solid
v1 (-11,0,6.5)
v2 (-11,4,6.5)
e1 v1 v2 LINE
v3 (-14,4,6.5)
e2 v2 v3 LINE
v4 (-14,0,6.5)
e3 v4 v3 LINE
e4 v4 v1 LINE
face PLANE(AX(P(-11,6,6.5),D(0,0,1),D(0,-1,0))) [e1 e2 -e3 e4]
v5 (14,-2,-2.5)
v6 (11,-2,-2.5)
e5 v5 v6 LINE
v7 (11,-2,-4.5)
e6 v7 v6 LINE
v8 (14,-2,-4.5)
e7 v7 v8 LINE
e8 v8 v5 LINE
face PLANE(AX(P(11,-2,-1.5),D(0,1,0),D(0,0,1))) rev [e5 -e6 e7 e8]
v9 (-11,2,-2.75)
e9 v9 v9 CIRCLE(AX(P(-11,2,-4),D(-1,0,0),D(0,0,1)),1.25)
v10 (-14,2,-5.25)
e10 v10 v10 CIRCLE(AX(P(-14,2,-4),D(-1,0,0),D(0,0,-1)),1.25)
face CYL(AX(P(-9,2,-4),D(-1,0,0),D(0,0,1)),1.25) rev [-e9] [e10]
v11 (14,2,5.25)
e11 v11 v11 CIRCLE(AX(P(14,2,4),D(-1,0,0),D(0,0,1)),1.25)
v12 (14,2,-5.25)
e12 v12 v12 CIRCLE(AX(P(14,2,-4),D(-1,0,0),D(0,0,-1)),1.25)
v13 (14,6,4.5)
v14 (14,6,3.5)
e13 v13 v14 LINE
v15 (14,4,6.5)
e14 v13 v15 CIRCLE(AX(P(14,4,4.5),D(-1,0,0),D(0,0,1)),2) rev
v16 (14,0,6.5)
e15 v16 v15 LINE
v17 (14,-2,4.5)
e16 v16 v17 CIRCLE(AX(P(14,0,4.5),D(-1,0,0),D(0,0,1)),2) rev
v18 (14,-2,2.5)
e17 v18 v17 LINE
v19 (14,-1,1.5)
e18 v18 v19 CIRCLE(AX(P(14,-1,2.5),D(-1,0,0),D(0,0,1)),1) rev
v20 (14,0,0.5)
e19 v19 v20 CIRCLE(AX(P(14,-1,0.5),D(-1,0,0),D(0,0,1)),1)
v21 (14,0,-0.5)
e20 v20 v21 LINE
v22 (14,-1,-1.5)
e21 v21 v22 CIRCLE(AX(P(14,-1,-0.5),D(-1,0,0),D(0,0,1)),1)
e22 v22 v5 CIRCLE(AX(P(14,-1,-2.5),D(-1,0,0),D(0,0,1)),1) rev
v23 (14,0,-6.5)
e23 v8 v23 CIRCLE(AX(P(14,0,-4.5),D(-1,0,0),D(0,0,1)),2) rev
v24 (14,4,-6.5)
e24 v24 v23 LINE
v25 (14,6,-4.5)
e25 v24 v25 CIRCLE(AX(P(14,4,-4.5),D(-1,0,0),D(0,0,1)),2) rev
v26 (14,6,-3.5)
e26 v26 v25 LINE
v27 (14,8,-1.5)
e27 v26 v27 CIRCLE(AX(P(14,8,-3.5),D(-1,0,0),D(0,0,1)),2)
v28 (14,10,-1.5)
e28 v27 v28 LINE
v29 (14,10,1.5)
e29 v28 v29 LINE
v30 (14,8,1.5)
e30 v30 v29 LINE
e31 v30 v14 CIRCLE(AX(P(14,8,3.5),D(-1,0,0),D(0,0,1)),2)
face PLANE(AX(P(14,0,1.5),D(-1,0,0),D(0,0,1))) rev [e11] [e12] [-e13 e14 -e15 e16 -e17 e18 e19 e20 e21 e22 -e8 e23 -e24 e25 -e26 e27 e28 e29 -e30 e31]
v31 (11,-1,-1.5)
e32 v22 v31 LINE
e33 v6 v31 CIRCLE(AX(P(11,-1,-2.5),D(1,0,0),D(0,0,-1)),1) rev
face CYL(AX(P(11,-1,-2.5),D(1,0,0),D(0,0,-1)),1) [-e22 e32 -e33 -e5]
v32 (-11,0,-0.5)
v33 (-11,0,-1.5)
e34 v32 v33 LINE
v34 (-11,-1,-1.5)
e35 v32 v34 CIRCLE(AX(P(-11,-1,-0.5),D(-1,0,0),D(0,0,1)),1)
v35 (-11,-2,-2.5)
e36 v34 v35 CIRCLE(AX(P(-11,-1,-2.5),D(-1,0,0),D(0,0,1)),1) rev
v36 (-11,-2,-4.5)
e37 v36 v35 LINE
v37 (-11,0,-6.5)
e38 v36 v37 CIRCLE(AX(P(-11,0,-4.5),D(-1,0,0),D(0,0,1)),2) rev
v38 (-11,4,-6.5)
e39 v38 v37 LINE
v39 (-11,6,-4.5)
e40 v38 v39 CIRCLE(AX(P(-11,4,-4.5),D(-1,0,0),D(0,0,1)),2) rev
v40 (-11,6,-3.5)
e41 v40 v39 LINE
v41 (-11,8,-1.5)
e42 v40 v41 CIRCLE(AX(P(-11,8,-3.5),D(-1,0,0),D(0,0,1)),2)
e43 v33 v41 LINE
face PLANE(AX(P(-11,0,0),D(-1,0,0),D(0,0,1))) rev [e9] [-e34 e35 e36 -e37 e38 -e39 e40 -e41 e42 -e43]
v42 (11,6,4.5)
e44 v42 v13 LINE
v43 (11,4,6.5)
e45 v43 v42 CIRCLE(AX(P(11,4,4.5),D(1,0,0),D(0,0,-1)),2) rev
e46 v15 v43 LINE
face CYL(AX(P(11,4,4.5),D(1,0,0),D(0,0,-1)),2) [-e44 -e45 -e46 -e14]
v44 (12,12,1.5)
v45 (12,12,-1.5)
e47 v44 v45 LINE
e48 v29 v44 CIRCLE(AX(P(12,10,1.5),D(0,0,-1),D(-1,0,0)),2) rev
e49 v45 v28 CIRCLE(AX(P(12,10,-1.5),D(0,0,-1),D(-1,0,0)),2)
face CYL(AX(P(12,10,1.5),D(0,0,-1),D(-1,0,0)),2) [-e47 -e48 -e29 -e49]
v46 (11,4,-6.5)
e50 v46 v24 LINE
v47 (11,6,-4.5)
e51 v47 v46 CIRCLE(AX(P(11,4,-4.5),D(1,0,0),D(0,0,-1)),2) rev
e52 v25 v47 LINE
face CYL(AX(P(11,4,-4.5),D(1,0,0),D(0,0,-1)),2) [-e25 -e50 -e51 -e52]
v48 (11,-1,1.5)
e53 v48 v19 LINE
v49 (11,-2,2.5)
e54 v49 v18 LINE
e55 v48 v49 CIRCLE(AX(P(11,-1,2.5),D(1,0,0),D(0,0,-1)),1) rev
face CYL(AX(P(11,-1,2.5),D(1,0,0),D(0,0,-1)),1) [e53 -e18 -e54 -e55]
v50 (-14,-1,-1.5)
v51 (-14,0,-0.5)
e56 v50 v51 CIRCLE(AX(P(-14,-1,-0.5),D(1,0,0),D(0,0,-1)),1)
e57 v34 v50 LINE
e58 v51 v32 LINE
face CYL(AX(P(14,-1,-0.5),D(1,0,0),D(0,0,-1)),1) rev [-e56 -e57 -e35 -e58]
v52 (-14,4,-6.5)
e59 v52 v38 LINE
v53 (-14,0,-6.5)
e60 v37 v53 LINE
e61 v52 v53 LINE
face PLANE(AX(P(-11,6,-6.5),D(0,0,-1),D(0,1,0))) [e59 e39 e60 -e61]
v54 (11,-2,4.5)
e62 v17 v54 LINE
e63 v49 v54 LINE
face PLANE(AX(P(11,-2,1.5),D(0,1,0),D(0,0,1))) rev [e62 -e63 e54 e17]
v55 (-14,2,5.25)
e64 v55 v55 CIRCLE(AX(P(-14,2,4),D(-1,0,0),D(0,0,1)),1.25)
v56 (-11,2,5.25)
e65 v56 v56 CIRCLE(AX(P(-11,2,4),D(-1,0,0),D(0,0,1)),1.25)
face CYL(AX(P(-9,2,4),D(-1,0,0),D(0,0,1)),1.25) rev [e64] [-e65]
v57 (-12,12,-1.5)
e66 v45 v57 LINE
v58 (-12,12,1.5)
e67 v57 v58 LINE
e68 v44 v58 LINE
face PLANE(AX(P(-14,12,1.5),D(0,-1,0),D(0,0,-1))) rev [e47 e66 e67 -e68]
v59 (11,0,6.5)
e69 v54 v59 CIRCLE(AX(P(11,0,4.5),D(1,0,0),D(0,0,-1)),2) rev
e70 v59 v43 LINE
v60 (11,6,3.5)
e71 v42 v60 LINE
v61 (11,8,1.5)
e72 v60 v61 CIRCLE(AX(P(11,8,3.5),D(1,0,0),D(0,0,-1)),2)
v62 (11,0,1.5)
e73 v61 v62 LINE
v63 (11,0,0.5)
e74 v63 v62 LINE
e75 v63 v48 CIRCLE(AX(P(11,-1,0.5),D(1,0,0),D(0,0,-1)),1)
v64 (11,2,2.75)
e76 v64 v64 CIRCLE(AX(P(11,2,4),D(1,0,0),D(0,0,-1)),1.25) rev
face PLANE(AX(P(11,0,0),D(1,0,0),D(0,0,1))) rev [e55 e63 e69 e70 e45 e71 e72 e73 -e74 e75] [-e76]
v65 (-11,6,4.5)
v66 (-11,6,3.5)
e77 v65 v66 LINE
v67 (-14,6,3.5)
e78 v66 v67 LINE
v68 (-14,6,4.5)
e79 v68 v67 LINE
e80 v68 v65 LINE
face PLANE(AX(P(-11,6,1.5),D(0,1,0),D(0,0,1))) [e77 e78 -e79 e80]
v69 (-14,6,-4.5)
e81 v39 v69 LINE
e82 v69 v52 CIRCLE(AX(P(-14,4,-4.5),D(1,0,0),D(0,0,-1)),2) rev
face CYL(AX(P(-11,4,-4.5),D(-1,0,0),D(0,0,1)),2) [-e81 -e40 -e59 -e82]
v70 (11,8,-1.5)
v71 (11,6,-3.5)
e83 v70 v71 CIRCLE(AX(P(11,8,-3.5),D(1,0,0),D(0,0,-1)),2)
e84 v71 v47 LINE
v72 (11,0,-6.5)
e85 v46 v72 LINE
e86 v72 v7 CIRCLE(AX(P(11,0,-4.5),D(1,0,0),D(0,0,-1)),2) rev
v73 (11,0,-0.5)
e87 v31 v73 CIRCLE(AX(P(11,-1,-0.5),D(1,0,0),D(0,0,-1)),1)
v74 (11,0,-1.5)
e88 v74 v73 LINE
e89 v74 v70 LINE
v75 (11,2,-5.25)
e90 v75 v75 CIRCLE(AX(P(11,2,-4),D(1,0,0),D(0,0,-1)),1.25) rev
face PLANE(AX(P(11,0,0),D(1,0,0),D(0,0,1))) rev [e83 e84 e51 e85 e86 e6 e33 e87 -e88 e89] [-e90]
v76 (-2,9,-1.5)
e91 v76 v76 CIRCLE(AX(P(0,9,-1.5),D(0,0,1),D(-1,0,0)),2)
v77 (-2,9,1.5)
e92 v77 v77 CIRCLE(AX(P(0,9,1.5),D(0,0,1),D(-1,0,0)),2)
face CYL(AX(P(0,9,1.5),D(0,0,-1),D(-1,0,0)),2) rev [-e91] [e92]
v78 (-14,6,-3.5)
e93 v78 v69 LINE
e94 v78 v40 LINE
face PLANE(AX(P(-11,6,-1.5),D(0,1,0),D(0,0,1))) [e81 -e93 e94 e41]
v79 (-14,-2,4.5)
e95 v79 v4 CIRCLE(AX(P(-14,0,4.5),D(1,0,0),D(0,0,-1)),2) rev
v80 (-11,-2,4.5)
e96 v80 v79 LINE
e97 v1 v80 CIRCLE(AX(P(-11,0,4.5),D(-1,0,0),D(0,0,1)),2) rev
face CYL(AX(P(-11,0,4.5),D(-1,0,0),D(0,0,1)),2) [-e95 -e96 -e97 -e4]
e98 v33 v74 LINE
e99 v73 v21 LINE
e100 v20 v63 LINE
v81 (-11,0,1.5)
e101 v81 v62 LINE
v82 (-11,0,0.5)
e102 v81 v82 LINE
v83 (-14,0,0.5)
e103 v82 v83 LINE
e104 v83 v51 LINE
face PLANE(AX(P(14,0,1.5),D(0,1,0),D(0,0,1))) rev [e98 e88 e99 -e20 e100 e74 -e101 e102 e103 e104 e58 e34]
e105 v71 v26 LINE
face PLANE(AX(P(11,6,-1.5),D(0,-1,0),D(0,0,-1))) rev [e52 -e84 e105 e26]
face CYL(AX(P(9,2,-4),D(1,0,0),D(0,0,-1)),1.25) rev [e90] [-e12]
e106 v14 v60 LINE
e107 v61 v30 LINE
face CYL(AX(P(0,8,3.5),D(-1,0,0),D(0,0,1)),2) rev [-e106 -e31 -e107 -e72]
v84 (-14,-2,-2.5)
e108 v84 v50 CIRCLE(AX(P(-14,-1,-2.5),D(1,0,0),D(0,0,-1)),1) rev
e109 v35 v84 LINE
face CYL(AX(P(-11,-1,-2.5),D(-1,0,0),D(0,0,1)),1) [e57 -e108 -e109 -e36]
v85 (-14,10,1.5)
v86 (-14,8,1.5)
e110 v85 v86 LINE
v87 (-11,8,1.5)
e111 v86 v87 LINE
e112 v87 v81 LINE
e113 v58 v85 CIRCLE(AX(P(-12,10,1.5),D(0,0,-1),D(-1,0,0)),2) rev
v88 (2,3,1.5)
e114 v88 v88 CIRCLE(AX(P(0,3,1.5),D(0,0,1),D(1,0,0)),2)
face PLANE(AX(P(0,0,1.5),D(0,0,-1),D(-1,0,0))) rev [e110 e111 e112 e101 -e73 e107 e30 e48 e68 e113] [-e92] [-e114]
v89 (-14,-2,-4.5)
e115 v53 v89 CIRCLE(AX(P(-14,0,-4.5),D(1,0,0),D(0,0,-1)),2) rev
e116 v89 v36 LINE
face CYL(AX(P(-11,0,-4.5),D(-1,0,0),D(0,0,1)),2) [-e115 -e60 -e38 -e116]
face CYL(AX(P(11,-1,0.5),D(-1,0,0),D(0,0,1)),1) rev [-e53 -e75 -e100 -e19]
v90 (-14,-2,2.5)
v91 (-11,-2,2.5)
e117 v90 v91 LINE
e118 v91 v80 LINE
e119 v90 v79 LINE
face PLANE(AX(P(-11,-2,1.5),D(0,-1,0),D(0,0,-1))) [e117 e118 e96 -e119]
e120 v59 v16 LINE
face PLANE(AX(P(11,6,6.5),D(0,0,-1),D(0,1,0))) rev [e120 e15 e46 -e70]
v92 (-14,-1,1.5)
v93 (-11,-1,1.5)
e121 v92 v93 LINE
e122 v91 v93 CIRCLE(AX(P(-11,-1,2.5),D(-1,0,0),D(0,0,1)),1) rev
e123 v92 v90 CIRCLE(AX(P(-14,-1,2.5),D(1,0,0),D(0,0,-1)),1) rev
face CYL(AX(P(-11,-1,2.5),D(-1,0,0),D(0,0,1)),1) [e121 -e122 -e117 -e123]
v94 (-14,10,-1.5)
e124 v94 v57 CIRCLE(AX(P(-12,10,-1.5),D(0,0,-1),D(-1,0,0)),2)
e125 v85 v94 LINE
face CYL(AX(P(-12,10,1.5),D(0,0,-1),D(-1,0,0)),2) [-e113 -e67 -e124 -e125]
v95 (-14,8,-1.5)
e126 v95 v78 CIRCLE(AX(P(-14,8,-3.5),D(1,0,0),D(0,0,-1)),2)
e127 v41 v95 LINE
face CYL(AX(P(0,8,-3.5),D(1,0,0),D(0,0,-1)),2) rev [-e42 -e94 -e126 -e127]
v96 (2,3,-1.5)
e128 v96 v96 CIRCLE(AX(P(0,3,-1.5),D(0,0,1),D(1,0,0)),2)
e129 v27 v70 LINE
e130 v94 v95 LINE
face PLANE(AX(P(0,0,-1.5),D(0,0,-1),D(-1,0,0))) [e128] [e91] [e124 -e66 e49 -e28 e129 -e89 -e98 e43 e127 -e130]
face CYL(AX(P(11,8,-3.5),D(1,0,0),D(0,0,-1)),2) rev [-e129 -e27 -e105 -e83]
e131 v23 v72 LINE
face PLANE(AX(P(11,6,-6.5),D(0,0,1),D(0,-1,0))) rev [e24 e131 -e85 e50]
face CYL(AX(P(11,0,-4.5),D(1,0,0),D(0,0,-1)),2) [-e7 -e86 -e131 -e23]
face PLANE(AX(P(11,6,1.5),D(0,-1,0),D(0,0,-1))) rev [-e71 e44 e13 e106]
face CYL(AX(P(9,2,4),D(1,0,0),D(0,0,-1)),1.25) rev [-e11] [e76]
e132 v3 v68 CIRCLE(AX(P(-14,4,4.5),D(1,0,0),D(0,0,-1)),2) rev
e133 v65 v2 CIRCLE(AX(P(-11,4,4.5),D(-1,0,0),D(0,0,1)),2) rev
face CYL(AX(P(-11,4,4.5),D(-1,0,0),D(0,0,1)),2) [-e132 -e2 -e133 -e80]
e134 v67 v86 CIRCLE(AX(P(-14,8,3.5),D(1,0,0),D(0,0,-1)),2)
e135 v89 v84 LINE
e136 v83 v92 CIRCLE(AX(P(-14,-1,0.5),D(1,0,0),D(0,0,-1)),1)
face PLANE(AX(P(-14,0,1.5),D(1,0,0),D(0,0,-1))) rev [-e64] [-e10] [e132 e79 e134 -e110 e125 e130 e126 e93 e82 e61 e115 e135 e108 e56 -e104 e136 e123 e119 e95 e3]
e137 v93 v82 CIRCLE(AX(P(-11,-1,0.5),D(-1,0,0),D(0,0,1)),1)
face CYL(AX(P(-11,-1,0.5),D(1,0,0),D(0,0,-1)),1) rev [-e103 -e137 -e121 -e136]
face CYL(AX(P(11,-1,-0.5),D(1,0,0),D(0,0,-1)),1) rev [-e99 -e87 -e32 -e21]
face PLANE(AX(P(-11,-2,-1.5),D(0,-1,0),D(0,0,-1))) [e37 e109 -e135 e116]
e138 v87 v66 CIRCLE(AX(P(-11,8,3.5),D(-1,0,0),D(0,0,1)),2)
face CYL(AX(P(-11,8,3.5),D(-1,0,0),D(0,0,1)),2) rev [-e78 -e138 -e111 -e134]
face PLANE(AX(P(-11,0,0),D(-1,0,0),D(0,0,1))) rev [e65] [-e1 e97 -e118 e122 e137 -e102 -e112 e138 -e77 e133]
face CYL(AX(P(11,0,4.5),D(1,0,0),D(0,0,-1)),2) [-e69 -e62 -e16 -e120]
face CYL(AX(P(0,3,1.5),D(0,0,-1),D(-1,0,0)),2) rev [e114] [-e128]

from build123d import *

# Parameters (mm, degrees)
SKETCH_1_W          = 28
SKETCH_1_H          = 12
SKETCH_1_R          = 2
EXTRUDE_1_DEPTH     = 1.5
SKETCH_2_W          = 5
SKETCH_2_H          = 8
EXTRUDE_2_DEPTH     = 3
SKETCH_4_R          = 1.25
CUT_EXTRUDE_2_DEPTH = 5
FILLET_1_R          = 2
FILLET_2_R          = 1


with BuildPart() as part:
    # 草图1 → 凸台-拉伸1 (new, symmetric)
    with BuildSketch(Plane.XY):
        with Locations((0, 6)):
            Rectangle(SKETCH_1_W, SKETCH_1_H)
        with Locations((0, 3)):
            Circle(SKETCH_1_R, mode=Mode.SUBTRACT)
        with Locations(Location((0, 9, 0), (0, 0, 180))):
            Circle(SKETCH_1_R, mode=Mode.SUBTRACT)
    extrude(amount=EXTRUDE_1_DEPTH, both=True)

    # 草图2 → 凸台-拉伸2 (add)
    with BuildSketch(Plane.ZY.offset(14)):
        with Locations((4, 2)):
            Rectangle(SKETCH_2_W, SKETCH_2_H)
        with Locations((-4, 2)):
            Rectangle(SKETCH_2_W, SKETCH_2_H)
    extrude_2 = extrude(amount=-EXTRUDE_2_DEPTH)

    # 草图4 → 切除-拉伸2 (cut)
    with BuildSketch(Plane.ZY.offset(14)):
        with Locations((4, 2)):
            Circle(SKETCH_4_R)
        with Locations((-4, 2)):
            Circle(SKETCH_4_R)
    cut_extrude_2 = extrude(amount=-CUT_EXTRUDE_2_DEPTH, mode=Mode.SUBTRACT)

    # 镜向1: 凸台-拉伸2, 切除-拉伸2 across plane
    add(extrude_2.mirror(Plane(origin=(0, 0, 0), x_dir=(0, 0, 1), z_dir=(1, 0, 0))))
    add(cut_extrude_2.mirror(Plane(origin=(0, 0, 0), x_dir=(0, 0, 1), z_dir=(1, 0, 0))), mode=Mode.SUBTRACT)

    # 圆角1
    fillet_1_edges = [part.edges().sort_by_distance(p)[0] for p in [
        (-12.5, 6, 1.5),
        (-12.5, 6, 6.5),
        (-12.5, -2, 6.5),
        (-12.5, 6, -6.5),
        (-12.5, 6, -1.5),
        (-12.5, -2, -6.5),
        (12.5, 6, 1.5),
        (12.5, -2, 6.5),
        (12.5, 6, 6.5),
        (-14, 12, 0),
        (12.5, 6, -1.5),
        (14, 12, 0),
        (12.5, 6, -6.5),
        (12.5, -2, -6.5),
    ]]
    fillet(fillet_1_edges, radius=FILLET_1_R)

    # 圆角2
    fillet_2_edges = [part.edges().sort_by_distance(p)[0] for p in [
        (12.5, 0, -1.5),
        (12.5, 0, 1.5),
        (-12.5, 0, 1.5),
        (-12.5, 0, -1.5),
    ]]
    fillet(fillet_2_edges, radius=FILLET_2_R)
    fillet_2_2_edges = [part.edges().sort_by_distance(p)[0] for p in [
        (12.5, -2, -1.5),
        (12.5, -2, 1.5),
        (-12.5, -2, 1.5),
        (-12.5, -2, -1.5),
    ]]
    fillet(fillet_2_2_edges, radius=FILLET_2_R - 0.0001)  # a hair under: the kernel refuses the full size


solid = part.part
